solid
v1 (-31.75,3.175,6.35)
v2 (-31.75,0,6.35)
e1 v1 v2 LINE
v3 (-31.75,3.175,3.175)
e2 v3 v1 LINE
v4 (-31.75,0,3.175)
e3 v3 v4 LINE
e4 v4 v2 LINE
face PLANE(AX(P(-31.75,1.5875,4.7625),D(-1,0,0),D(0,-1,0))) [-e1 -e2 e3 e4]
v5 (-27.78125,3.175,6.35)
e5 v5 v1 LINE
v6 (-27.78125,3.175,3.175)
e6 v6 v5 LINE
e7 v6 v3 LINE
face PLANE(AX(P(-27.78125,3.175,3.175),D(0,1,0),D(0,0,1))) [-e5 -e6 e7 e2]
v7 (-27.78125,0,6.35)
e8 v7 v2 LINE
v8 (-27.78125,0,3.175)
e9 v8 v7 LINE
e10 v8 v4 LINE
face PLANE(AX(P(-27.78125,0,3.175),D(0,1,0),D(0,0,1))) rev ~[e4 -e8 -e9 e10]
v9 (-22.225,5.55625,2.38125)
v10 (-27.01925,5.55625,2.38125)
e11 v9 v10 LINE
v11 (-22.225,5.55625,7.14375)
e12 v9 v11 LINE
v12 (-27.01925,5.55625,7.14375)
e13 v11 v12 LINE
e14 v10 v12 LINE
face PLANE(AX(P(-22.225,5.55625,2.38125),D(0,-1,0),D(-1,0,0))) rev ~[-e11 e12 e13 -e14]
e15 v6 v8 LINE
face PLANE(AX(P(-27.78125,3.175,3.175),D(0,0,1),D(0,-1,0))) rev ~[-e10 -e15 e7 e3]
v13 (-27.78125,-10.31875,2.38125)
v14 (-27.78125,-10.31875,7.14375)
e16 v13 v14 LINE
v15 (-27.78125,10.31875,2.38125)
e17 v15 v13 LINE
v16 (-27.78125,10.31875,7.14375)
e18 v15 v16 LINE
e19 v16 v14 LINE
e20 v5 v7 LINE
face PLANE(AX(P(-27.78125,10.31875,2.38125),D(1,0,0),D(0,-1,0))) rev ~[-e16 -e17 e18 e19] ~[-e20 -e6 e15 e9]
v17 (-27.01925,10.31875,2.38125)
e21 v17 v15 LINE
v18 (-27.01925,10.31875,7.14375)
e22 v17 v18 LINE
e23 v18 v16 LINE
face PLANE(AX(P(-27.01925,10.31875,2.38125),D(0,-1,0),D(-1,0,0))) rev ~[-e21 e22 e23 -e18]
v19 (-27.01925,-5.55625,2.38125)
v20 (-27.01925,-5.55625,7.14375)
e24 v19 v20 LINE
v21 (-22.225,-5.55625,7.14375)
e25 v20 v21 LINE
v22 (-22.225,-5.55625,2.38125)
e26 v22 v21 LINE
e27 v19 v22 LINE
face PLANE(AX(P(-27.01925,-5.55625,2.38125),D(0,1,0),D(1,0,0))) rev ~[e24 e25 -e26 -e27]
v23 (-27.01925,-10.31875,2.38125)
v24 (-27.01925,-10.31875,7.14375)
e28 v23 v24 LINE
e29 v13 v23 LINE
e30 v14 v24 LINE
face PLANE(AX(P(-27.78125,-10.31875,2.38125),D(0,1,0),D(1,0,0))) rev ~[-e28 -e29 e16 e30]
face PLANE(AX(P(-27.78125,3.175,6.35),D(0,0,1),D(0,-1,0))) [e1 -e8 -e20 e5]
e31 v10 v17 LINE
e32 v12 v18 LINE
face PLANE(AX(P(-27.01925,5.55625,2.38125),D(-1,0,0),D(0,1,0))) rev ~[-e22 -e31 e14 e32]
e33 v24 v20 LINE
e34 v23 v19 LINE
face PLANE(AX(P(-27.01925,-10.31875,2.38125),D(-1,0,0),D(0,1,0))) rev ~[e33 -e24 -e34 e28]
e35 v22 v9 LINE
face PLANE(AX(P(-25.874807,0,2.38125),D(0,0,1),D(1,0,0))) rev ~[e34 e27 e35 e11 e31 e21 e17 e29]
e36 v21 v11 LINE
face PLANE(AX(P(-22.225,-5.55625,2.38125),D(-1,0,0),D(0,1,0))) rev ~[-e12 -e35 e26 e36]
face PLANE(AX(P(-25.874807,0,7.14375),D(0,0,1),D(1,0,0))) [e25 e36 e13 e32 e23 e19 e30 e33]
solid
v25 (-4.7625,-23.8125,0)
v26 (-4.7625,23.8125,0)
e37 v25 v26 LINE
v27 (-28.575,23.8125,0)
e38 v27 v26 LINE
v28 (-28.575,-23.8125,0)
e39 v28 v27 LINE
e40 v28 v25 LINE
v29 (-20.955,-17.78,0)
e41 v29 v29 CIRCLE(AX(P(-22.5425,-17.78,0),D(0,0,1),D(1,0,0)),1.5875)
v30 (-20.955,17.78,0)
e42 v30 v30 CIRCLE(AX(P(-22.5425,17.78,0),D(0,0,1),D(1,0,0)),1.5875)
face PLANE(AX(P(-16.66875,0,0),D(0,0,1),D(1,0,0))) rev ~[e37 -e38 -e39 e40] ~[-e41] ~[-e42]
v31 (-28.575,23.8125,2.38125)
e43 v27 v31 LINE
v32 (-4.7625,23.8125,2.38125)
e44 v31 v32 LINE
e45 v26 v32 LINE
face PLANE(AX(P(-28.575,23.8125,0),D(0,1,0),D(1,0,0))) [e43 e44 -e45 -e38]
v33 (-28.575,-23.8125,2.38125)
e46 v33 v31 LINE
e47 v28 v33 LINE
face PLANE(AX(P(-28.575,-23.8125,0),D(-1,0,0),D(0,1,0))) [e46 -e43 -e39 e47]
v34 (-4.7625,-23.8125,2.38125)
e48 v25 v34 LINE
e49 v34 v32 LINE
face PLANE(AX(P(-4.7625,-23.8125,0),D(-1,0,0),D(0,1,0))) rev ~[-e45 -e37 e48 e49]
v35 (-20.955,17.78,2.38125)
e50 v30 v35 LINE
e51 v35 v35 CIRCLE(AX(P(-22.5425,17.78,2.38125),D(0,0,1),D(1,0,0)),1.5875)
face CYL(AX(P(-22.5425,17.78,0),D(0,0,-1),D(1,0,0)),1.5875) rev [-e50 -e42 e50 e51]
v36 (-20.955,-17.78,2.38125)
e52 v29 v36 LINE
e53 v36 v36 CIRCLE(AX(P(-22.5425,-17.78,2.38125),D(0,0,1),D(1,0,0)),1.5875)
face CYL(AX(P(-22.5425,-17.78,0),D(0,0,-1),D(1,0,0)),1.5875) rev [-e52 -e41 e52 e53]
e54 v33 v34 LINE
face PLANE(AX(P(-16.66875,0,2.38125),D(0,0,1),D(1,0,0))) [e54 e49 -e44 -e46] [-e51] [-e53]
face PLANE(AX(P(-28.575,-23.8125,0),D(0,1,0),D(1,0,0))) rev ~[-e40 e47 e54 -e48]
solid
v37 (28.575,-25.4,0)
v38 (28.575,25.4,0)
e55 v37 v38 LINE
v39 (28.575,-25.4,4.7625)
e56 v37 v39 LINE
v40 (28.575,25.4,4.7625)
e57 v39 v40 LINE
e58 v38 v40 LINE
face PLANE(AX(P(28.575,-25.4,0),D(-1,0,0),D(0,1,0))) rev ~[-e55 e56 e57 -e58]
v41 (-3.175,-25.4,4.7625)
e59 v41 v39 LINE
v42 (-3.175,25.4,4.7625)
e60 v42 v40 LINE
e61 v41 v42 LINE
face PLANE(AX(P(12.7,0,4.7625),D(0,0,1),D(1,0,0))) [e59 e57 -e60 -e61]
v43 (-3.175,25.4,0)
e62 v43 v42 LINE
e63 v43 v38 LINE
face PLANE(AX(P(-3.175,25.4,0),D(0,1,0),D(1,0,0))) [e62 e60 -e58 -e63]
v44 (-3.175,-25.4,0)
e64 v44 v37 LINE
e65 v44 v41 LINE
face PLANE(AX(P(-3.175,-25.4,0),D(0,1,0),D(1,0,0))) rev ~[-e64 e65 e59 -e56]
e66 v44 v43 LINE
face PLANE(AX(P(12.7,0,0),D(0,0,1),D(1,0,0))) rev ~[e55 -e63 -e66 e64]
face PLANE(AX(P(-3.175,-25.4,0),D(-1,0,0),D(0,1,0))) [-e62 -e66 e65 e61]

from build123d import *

# Parameters (mm, degrees)
F0_W     = 31.75
F0_H     = 50.8
F1_DEPTH = 4.7625
F2_W     = 23.8125
F2_H     = 47.625
F2_R     = 1.5875
F3_DEPTH = 2.38125
F5_DEPTH = 4.7625
F6_W     = 3.175
F6_H     = 3.175
F7_DEPTH = 3.96875


# Not quite as in the source:
# - a length typed as a fraction of an inch, garbled in the dataset ("3 / 203.2 mm" for 3/8 in), is restored


with BuildPart() as f1:
    # F0 (on Top) → F1 (new body)
    with BuildSketch(Plane.XY):
        with Locations((12.7, 0)):
            Rectangle(F0_W, F0_H)
    extrude(amount=F1_DEPTH)


with BuildPart() as f3:
    # F2 (on Top) → F3 (new body)
    with BuildSketch(Plane.XY):
        with Locations((-16.66875, 0)):
            Rectangle(F2_W, F2_H)
        with Locations((-22.5425, -17.78)):
            Circle(F2_R, mode=Mode.SUBTRACT)
        with Locations((-22.5425, 17.78)):
            Circle(F2_R, mode=Mode.SUBTRACT)
    extrude(amount=F3_DEPTH)


with BuildPart() as f5:
    # F4 (on face) → F5 (new body)
    with BuildSketch(Plane.XY.offset(2.38125)):
        Polygon((-27.01925, 10.31875), (-27.78125, 10.31875), (-27.78125, -10.31875), (-27.01925, -10.31875), (-27.01925, -5.55625), (-22.225, -5.55625), (-22.225, 5.55625), (-27.01925, 5.55625), align=None)
    extrude(amount=F5_DEPTH)

    # F6 (on face) → F7 (join)
    with BuildSketch(Plane(origin=(-27.78125, 0, 0), x_dir=(0, -1, 0), z_dir=(-1, 0, 0))):
        with Locations((-1.5875, 4.7625)):
            Rectangle(F6_W, F6_H)
    extrude(amount=F7_DEPTH)


solid = Compound([f1.part, f3.part, f5.part])
